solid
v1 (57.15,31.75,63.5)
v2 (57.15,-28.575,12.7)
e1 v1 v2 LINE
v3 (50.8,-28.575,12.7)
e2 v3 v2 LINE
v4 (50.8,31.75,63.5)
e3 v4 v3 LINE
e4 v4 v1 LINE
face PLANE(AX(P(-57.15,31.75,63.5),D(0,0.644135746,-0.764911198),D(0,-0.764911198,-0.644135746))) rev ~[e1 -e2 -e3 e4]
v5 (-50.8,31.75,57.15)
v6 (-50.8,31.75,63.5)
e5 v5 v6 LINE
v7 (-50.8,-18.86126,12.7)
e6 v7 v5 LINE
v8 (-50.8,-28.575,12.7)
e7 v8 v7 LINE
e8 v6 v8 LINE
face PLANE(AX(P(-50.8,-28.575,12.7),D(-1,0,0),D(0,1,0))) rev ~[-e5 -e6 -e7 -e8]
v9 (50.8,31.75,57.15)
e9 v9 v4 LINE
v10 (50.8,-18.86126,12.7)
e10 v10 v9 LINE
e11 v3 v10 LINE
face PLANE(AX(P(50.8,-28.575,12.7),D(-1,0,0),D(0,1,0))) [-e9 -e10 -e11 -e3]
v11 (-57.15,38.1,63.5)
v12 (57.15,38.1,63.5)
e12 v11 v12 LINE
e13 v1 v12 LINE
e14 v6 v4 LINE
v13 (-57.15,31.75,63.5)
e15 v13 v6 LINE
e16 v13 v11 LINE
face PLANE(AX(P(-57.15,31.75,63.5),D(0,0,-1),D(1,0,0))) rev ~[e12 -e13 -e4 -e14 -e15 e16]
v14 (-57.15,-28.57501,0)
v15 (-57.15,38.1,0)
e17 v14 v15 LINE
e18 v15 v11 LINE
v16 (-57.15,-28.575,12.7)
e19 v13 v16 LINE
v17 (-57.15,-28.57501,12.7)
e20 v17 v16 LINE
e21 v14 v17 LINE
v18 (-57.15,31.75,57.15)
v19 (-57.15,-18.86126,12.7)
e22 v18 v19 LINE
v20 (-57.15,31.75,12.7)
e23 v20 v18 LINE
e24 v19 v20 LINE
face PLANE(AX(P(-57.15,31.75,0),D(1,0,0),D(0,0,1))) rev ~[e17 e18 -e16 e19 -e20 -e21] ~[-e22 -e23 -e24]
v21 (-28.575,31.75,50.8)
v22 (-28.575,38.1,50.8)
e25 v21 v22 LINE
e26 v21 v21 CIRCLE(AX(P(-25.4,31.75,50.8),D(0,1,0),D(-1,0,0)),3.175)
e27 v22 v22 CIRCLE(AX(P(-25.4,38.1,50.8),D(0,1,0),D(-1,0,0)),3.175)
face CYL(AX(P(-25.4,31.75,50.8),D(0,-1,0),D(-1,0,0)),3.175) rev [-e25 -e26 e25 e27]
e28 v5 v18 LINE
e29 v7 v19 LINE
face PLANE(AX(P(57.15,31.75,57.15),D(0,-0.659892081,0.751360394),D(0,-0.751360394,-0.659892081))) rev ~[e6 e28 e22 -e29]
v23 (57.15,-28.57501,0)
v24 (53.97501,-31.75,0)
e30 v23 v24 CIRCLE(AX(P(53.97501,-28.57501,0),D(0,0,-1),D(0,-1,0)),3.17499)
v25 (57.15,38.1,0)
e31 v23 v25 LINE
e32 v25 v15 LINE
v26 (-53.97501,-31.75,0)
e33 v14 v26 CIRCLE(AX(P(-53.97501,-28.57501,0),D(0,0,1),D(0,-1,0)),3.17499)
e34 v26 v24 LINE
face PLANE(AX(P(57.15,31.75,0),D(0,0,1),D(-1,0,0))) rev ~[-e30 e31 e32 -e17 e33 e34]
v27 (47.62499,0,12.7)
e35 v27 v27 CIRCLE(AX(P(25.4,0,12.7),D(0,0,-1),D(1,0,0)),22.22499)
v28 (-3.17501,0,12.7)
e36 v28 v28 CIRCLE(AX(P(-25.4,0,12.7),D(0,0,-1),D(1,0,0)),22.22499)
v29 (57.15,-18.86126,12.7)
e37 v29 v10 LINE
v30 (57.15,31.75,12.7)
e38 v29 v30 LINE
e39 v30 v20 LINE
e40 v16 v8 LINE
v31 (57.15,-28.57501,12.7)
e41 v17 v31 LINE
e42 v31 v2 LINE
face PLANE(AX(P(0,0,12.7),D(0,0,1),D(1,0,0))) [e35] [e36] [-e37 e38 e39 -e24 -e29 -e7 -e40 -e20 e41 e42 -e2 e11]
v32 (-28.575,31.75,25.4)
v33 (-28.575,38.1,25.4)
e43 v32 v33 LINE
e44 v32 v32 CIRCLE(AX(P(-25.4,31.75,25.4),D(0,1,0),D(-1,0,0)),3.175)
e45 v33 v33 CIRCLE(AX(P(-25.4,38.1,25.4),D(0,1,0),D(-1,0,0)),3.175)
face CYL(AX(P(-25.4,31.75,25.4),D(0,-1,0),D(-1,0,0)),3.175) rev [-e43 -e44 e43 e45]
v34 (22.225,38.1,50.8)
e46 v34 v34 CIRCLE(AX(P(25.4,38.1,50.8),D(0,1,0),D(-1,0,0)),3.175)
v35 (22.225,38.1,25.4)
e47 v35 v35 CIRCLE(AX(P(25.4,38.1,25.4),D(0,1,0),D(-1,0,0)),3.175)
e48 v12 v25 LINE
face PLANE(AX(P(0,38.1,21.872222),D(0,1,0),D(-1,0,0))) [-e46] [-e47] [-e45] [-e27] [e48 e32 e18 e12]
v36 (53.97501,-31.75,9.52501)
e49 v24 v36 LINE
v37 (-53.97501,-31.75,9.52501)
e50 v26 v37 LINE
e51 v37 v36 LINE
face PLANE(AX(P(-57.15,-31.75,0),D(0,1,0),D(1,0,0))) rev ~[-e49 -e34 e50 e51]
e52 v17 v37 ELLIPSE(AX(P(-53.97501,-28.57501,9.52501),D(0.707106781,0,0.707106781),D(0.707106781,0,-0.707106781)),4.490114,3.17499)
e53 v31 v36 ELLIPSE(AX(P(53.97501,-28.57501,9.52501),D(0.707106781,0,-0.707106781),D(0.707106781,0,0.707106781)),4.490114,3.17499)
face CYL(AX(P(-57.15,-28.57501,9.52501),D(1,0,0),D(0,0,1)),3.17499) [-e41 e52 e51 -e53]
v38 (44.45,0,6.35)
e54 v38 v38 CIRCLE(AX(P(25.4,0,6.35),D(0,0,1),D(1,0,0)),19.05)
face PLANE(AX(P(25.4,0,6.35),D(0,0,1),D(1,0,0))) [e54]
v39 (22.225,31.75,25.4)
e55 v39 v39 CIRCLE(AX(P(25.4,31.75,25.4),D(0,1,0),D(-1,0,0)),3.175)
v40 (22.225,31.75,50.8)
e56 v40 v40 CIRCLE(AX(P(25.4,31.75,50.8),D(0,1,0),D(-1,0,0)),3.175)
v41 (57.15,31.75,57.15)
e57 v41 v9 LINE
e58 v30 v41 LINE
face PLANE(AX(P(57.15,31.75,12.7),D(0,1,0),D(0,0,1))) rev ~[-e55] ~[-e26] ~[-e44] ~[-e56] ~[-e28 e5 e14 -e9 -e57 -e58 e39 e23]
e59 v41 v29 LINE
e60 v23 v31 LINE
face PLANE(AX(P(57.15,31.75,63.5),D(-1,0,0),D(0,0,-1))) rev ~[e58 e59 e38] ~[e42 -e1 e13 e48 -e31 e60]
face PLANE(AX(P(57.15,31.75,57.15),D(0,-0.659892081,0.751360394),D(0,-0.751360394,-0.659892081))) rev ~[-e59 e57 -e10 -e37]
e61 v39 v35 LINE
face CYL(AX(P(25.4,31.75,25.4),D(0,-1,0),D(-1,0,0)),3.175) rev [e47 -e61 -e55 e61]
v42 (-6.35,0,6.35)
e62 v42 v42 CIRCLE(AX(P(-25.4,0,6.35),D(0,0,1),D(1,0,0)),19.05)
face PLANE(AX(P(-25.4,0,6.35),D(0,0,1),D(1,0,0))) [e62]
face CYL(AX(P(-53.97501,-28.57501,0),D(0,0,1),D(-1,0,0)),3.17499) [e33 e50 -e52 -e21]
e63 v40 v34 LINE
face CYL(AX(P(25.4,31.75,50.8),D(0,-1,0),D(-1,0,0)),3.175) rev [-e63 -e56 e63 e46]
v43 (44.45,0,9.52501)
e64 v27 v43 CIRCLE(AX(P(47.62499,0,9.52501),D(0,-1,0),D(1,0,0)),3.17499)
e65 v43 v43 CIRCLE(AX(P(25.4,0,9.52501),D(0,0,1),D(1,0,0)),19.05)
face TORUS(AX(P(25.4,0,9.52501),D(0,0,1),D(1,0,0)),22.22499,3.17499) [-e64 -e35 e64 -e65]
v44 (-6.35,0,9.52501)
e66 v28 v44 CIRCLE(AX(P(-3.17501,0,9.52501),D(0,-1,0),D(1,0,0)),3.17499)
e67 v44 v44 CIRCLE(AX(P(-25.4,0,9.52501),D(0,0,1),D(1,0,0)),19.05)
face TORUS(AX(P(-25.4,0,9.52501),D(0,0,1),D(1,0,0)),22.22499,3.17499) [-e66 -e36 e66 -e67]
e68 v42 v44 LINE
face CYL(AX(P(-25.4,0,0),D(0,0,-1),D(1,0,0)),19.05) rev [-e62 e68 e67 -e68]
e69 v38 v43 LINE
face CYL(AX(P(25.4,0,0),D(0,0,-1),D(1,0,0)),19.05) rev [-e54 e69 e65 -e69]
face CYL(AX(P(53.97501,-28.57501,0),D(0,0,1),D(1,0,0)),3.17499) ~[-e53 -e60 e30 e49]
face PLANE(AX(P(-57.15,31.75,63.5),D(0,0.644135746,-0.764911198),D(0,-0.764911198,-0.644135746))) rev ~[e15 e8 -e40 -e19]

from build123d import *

# Parameters (mm, degrees)
F0_W      = 114.3
F0_H      = 63.5
F0_R      = 19.05
F1_DEPTH  = 12.7
F2_DEPTH  = 6.35
F3_W      = 6.35
F3_H      = 60.325
F4_DEPTH  = 50.8
F6_DEPTH  = 114.301
F7_W      = 101.6
F7_H      = 50.8
F7_R      = 3.175
F8_DEPTH  = 6.35
F9_R      = 3.17499
F11_DEPTH = 114.301


# Not quite as in the source:
# - a fillet or chamfer is up to 0.001 mm smaller than in the source, because OpenCascade refuses the exact size


with BuildPart() as f1:
    # F0 (on Top) → F1 (new body)
    with BuildSketch(Plane.XY):
        Rectangle(F0_W, F0_H)
        with Locations((-25.4, 0)):
            Circle(F0_R, mode=Mode.SUBTRACT)
        with Locations((25.4, 0)):
            Circle(F0_R, mode=Mode.SUBTRACT)
    extrude(amount=F1_DEPTH)

    # F0 (on Top) → F2 (join)
    with BuildSketch(Plane.XY):
        with Locations((-25.4, 0)):
            Circle(F0_R)
        with Locations((25.4, 0)):
            Circle(F0_R)
    extrude(amount=F2_DEPTH)

    # F3 (on face) → F4 (join)
    with BuildSketch(Plane.XY.offset(12.7)):
        with Locations((-53.975, 1.5875)):
            Rectangle(F3_W, F3_H)
        with Locations((53.975, 1.5875)):
            Rectangle(F3_W, F3_H)
    extrude(amount=F4_DEPTH)

    # F5 (on face) → F6 (cut, through all)
    with BuildSketch(Plane(origin=(-57.15, 0, 0), x_dir=(0, -1, 0), z_dir=(-1, 0, 0))):
        Polygon((28.575, 63.5), (-31.75, 63.5), (28.575, 12.7), align=None)
    extrude(amount=-F6_DEPTH, mode=Mode.SUBTRACT)

    # F7 (on face) → F8 (join)
    with BuildSketch(Plane(origin=(0, 31.75, 0), x_dir=(-1, 0, 0), z_dir=(0, 1, 0))):
        Polygon((-50.8, 12.7), (-50.8, 63.5), (-57.15, 63.5), (-57.15, 0), (57.15, 0), (57.15, 63.5), (50.8, 63.5), (50.8, 12.7), align=None)
        with Locations((0, 38.1)):
            Rectangle(F7_W, F7_H)
        with Locations((-25.4, 25.4)):
            Circle(F7_R, mode=Mode.SUBTRACT)
        with Locations((25.4, 25.4)):
            Circle(F7_R, mode=Mode.SUBTRACT)
        with Locations((-25.4, 50.8)):
            Circle(F7_R, mode=Mode.SUBTRACT)
        with Locations((25.4, 50.8)):
            Circle(F7_R, mode=Mode.SUBTRACT)
    extrude(amount=F8_DEPTH)

    # F9 (radius 3.175 in the source; OpenCascade refuses exactly that, so slightly less here)
    f9_edges = [f1.edges().sort_by_distance(p)[0] for p in [
        (-44.45, 0, 12.7),
        (6.35, 0, 12.7),
        (0, -31.75, 12.7),
        (57.15, -31.75, 6.35),
        (-57.15, -31.75, 6.35),
    ]]
    fillet(f9_edges, radius=F9_R)

    # F10 (on face) → F11 (cut, through all)
    with BuildSketch(Plane.YZ.offset(57.15)):
        Polygon((31.75, 12.7), (31.75, 57.15), (-18.8612597303, 12.7), align=None)
    extrude(amount=-F11_DEPTH, mode=Mode.SUBTRACT)


solid = f1.part
